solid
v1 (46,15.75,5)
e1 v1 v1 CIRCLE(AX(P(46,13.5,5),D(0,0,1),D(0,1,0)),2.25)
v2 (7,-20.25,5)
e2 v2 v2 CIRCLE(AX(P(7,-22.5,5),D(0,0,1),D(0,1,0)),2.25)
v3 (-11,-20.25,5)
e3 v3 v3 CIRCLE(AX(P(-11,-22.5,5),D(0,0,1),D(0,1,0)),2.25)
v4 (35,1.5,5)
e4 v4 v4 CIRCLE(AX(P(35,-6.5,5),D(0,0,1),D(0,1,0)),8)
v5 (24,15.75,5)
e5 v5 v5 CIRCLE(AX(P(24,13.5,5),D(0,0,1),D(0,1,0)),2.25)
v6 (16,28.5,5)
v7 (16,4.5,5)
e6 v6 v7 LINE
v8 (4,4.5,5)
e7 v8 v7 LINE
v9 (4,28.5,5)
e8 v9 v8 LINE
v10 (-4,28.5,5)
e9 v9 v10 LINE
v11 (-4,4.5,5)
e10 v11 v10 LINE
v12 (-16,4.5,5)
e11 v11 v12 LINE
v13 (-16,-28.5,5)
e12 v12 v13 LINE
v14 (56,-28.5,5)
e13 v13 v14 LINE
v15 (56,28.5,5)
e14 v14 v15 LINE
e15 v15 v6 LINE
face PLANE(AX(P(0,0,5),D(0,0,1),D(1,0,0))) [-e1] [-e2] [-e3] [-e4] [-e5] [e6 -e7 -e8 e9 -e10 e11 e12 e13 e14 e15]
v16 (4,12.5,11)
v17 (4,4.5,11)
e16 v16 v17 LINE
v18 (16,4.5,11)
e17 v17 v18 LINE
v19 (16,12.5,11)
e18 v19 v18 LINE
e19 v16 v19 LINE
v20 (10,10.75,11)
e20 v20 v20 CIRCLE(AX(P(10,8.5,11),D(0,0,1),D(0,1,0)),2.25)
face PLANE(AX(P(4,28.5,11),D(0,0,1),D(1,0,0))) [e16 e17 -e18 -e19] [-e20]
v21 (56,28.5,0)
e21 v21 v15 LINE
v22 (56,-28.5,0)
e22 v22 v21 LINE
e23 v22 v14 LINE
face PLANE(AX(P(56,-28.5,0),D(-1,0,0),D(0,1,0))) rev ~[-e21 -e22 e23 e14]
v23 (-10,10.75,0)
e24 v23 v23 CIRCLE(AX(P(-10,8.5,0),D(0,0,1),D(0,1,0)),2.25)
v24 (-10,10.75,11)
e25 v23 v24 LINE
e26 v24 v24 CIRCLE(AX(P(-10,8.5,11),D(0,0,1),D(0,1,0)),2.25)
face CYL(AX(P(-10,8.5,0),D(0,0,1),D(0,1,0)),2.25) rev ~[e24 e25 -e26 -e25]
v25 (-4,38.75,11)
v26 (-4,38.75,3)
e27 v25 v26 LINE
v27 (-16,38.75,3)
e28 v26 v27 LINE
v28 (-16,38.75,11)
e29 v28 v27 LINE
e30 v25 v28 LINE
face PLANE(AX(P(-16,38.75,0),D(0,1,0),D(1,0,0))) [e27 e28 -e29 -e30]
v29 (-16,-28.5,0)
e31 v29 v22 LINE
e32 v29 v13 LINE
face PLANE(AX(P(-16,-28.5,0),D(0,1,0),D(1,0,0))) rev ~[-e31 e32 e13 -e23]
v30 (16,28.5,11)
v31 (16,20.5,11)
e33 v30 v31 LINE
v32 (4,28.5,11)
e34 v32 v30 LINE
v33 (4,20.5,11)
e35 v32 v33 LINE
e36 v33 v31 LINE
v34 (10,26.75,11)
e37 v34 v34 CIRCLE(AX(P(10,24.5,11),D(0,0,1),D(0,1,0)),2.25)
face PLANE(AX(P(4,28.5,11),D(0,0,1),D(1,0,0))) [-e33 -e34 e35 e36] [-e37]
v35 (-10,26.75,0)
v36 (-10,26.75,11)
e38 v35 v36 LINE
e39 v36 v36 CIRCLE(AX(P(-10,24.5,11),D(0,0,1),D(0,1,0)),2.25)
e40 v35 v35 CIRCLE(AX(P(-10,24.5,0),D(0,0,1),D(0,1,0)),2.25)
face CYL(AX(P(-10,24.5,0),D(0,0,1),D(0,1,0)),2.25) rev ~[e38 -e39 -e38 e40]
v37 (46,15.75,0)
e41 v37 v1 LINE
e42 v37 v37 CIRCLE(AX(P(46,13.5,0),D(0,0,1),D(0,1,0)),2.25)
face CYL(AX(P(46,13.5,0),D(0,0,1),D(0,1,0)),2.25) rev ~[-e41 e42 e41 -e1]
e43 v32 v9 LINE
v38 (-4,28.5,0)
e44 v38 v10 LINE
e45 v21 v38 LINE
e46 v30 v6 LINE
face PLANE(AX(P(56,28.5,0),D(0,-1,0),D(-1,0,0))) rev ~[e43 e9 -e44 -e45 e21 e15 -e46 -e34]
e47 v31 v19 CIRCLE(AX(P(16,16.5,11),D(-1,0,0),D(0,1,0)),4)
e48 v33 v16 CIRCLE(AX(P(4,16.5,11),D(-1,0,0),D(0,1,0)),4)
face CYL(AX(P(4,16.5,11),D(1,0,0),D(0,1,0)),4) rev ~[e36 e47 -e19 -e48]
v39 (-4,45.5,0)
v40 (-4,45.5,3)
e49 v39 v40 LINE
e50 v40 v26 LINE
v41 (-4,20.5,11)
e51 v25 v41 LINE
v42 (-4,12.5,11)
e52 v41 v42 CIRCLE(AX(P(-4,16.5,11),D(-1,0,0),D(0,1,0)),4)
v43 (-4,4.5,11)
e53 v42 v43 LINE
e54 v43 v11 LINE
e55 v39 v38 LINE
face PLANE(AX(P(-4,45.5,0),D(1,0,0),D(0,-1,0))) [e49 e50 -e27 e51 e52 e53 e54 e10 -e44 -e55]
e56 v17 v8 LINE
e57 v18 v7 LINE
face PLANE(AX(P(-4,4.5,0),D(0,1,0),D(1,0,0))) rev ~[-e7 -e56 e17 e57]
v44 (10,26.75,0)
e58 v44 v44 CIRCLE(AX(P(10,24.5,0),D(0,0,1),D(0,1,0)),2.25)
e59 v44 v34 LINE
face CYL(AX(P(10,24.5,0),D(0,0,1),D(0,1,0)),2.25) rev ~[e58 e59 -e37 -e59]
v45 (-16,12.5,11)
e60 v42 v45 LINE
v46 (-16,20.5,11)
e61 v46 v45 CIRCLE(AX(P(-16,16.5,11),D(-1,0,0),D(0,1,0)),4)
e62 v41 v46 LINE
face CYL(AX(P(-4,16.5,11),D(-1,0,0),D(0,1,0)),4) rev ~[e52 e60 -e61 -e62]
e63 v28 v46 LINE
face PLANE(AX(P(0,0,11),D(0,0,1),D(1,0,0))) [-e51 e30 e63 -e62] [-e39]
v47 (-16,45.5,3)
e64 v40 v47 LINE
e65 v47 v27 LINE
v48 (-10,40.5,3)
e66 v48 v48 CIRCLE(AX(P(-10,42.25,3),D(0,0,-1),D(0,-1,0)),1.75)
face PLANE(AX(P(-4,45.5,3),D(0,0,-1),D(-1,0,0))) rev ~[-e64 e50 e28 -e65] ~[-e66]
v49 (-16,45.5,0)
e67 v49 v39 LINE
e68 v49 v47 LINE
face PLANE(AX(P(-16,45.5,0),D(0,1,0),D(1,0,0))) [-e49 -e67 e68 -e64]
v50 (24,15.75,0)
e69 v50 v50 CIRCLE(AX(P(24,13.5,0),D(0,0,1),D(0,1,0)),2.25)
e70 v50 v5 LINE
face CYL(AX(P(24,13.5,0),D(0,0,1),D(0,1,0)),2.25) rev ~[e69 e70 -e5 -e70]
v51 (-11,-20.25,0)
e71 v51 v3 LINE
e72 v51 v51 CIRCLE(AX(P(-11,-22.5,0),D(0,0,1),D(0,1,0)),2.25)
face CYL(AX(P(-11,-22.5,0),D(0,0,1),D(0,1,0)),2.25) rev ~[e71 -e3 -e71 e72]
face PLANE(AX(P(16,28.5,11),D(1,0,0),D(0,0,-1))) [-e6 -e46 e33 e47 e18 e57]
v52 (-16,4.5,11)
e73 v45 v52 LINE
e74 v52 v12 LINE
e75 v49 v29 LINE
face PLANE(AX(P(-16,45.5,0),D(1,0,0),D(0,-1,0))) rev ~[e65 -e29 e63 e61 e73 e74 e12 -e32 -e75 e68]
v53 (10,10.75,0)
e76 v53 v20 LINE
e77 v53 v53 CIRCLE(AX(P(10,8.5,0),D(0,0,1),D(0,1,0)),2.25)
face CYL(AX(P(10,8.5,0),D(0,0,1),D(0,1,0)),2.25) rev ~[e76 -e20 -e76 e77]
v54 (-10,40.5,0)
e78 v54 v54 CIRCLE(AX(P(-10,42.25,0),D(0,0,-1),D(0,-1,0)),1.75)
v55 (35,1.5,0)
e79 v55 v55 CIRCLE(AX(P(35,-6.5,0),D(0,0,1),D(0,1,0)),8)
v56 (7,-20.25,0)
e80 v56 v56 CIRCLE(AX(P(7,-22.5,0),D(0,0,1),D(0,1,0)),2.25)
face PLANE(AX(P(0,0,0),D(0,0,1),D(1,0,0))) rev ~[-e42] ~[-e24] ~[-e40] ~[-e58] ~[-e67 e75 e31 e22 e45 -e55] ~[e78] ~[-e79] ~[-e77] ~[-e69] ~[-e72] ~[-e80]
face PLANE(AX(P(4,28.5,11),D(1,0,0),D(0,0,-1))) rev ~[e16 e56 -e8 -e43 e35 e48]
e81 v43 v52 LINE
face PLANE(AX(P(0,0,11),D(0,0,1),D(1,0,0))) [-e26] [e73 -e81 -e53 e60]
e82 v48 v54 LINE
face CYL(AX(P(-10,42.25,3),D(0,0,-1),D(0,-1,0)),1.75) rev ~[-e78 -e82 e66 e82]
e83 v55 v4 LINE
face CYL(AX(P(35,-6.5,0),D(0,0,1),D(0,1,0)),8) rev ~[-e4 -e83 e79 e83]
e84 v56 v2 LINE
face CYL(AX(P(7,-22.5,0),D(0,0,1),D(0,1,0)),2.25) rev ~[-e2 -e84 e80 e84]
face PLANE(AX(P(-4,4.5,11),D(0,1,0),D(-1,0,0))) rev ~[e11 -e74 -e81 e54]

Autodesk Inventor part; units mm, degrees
ref_plane "YZ Plane" through (0, 0, 0) normal (1, 0, 0) x (0, 1, 0)
ref_plane "XZ Plane" through (0, 0, 0) normal (0, 1, 0) x (-1, 0, 0)
ref_plane "XY Plane" through (0, 0, 0) normal (0, 0, 1) x (1, 0, 0)
sketch "Sketch1" plane through (0, 0, 0) normal (0, 0, 1) x (1, 0, 0)
  line L0 (-16, 45.5) -> (-4, 45.5)
  line L1 (-16, 45.5) -> (-16, -28.5)
  line L2 (-16, -28.5) -> (56, -28.5)
  line L3 (56, 28.5) -> (-4, 28.5)
  line L4 (56, -28.5) -> (56, 28.5)
  line L5 (-4, 45.5) -> (-4, 28.5)
extrude "Extrusion4" add sketch "Sketch1" along normal blind 11
sketch "Sketch2" plane through (0, 0, 11) normal (0, 0, 1) x (1, 0, 0)
  line L0 (56, -28.5) -> (56, 28.5)
  line L1 (-4, 4.5) -> (-16, 4.5)
  line L2 (-4, 4.5) -> (-4, 28.5)
  line L3 (-16, 4.5) -> (-16, -28.5)
  line L4 (-16, -28.5) -> (56, -28.5)
  line L5 (56, 28.5) -> (-4, 28.5)
extrude "Extrusion3" cut sketch "Sketch2" against normal blind 6 draft 0
sketch "Sketch3" plane through (-4, 28.5, 0) normal (0, 1, 0) x (1, 0, 0)
  line L0 (20, -11) -> (20, -5)
  line L1 (8, -5) -> (20, -5)
  line L2 (8, -11) -> (20, -11)
  line L3 (8, -11) -> (8, -5)
extrude "Extrusion2" add sketch "Sketch3" against normal blind 24
sketch "Sketch4" plane through (-16, 45.5, 0) normal (0, 1, 0) x (1, 0, 0)
  line L0 (12, -11) -> (0, -11)
  line L1 (0, -11) -> (0, -3)
  line L2 (12, -11) -> (12, -3)
  line L3 (12, -3) -> (0, -3)
extrude "Extrusion1" cut sketch "Sketch4" against normal blind 6.75
hole "Hole10" at (-10, 42.25, 3) direction (0, 0, -1) diameter 3.5 depth 3
hole "Hole9" at (24, 13.5, 0) direction (0, 0, 1) diameter 4.5 depth 5
hole "Hole8" at (46, 13.5, 0) direction (0, 0, 1) diameter 4.5 depth 5
hole "Hole7" at (7, -22.5, 0) direction (0, 0, 1) diameter 4.5 depth 5
hole "Hole6" at (-11, -22.5, 0) direction (0, 0, 1) diameter 4.5 depth 5
sketch "Sketch9" plane through (0, 0, 0) normal (0, 0, 1) x (1, 0, 0)
  point P0 (-11, -22.5)
hole "Hole5" at (35, -6.5, 0) direction (0, 0, 1) diameter 16 depth 5
sketch "Sketch8" plane through (0, 0, 0) normal (0, 0, 1) x (1, 0, 0)
  point P0 (7, -22.5)
hole "Hole4" at (10, 8.5, 0) direction (0, 0, 1) diameter 4.5 depth 11
sketch "Sketch7" plane through (0, 0, 0) normal (0, 0, 1) x (1, 0, 0)
  point P0 (46, 13.5)
hole "Hole3" at (10, 24.5, 0) direction (0, 0, 1) diameter 4.5 depth 11
sketch "Sketch6" plane through (0, 0, 0) normal (0, 0, 1) x (1, 0, 0)
  point P0 (24, 13.5)
hole "Hole2" at (-10, 8.5, 0) direction (0, 0, 1) diameter 4.5 depth 11
sketch "Sketch5" plane through (-16, 45.5, 3) normal (0, 0, 1) x (1, 0, 0)
  point P0 (6, -3.25)
hole "Hole1" at (-10, 24.5, 0) direction (0, 0, 1) diameter 4.5 depth 11
sketch "Sketch15" plane through (0, 0, 11) normal (0, 0, 1) x (1, 0, 0)
  line L0 (4, 20.5) -> (16, 20.5)
  line L1 (4, 20.5) -> (4, 16.5)
  line L2 (16, 20.5) -> (16, 16.5)
  line L3 (4, 16.5) -> (16, 16.5)
  line L4 (4, 16.5) -> (14, 16.5)
revolve "Revolution2" cut sketch "Sketch15" angle 180 about axis through (4, 16.5, 11) along (-1, 0, 0)
sketch "Sketch16" plane through (4, 28.5, 11) normal (0, 0, 1) x (1, 0, 0)
  line L0 (-8, -8) -> (-20, -8)
  line L1 (-8, -8) -> (-8, -12)
  line L2 (-20, -8) -> (-20, -12)
  line L3 (-8, -12) -> (-20, -12)
  line L4 (-8, -12) -> (-18, -12)
revolve "Revolution1" cut sketch "Sketch16" angle 180 about axis through (-4, 16.5, 11) along (-1, 0, 0)
sketch "Sketch10" plane through (0, 0, 0) normal (0, 0, 1) x (1, 0, 0)
  point P0 (35, -6.5)
sketch "Sketch11" plane through (0, 0, 0) normal (0, 0, 1) x (1, 0, 0)
  point P0 (10, 8.5)
sketch "Sketch12" plane through (0, 0, 0) normal (0, 0, 1) x (1, 0, 0)
  point P0 (10, 24.5)
sketch "Sketch13" plane through (0, 0, 0) normal (0, 0, 1) x (1, 0, 0)
  point P0 (-10, 8.5)
sketch "Sketch14" plane through (0, 0, 0) normal (0, 0, 1) x (1, 0, 0)
  point P0 (-10, 24.5)
properties part number "X-axis driver holder" material "ASA Plastic"
